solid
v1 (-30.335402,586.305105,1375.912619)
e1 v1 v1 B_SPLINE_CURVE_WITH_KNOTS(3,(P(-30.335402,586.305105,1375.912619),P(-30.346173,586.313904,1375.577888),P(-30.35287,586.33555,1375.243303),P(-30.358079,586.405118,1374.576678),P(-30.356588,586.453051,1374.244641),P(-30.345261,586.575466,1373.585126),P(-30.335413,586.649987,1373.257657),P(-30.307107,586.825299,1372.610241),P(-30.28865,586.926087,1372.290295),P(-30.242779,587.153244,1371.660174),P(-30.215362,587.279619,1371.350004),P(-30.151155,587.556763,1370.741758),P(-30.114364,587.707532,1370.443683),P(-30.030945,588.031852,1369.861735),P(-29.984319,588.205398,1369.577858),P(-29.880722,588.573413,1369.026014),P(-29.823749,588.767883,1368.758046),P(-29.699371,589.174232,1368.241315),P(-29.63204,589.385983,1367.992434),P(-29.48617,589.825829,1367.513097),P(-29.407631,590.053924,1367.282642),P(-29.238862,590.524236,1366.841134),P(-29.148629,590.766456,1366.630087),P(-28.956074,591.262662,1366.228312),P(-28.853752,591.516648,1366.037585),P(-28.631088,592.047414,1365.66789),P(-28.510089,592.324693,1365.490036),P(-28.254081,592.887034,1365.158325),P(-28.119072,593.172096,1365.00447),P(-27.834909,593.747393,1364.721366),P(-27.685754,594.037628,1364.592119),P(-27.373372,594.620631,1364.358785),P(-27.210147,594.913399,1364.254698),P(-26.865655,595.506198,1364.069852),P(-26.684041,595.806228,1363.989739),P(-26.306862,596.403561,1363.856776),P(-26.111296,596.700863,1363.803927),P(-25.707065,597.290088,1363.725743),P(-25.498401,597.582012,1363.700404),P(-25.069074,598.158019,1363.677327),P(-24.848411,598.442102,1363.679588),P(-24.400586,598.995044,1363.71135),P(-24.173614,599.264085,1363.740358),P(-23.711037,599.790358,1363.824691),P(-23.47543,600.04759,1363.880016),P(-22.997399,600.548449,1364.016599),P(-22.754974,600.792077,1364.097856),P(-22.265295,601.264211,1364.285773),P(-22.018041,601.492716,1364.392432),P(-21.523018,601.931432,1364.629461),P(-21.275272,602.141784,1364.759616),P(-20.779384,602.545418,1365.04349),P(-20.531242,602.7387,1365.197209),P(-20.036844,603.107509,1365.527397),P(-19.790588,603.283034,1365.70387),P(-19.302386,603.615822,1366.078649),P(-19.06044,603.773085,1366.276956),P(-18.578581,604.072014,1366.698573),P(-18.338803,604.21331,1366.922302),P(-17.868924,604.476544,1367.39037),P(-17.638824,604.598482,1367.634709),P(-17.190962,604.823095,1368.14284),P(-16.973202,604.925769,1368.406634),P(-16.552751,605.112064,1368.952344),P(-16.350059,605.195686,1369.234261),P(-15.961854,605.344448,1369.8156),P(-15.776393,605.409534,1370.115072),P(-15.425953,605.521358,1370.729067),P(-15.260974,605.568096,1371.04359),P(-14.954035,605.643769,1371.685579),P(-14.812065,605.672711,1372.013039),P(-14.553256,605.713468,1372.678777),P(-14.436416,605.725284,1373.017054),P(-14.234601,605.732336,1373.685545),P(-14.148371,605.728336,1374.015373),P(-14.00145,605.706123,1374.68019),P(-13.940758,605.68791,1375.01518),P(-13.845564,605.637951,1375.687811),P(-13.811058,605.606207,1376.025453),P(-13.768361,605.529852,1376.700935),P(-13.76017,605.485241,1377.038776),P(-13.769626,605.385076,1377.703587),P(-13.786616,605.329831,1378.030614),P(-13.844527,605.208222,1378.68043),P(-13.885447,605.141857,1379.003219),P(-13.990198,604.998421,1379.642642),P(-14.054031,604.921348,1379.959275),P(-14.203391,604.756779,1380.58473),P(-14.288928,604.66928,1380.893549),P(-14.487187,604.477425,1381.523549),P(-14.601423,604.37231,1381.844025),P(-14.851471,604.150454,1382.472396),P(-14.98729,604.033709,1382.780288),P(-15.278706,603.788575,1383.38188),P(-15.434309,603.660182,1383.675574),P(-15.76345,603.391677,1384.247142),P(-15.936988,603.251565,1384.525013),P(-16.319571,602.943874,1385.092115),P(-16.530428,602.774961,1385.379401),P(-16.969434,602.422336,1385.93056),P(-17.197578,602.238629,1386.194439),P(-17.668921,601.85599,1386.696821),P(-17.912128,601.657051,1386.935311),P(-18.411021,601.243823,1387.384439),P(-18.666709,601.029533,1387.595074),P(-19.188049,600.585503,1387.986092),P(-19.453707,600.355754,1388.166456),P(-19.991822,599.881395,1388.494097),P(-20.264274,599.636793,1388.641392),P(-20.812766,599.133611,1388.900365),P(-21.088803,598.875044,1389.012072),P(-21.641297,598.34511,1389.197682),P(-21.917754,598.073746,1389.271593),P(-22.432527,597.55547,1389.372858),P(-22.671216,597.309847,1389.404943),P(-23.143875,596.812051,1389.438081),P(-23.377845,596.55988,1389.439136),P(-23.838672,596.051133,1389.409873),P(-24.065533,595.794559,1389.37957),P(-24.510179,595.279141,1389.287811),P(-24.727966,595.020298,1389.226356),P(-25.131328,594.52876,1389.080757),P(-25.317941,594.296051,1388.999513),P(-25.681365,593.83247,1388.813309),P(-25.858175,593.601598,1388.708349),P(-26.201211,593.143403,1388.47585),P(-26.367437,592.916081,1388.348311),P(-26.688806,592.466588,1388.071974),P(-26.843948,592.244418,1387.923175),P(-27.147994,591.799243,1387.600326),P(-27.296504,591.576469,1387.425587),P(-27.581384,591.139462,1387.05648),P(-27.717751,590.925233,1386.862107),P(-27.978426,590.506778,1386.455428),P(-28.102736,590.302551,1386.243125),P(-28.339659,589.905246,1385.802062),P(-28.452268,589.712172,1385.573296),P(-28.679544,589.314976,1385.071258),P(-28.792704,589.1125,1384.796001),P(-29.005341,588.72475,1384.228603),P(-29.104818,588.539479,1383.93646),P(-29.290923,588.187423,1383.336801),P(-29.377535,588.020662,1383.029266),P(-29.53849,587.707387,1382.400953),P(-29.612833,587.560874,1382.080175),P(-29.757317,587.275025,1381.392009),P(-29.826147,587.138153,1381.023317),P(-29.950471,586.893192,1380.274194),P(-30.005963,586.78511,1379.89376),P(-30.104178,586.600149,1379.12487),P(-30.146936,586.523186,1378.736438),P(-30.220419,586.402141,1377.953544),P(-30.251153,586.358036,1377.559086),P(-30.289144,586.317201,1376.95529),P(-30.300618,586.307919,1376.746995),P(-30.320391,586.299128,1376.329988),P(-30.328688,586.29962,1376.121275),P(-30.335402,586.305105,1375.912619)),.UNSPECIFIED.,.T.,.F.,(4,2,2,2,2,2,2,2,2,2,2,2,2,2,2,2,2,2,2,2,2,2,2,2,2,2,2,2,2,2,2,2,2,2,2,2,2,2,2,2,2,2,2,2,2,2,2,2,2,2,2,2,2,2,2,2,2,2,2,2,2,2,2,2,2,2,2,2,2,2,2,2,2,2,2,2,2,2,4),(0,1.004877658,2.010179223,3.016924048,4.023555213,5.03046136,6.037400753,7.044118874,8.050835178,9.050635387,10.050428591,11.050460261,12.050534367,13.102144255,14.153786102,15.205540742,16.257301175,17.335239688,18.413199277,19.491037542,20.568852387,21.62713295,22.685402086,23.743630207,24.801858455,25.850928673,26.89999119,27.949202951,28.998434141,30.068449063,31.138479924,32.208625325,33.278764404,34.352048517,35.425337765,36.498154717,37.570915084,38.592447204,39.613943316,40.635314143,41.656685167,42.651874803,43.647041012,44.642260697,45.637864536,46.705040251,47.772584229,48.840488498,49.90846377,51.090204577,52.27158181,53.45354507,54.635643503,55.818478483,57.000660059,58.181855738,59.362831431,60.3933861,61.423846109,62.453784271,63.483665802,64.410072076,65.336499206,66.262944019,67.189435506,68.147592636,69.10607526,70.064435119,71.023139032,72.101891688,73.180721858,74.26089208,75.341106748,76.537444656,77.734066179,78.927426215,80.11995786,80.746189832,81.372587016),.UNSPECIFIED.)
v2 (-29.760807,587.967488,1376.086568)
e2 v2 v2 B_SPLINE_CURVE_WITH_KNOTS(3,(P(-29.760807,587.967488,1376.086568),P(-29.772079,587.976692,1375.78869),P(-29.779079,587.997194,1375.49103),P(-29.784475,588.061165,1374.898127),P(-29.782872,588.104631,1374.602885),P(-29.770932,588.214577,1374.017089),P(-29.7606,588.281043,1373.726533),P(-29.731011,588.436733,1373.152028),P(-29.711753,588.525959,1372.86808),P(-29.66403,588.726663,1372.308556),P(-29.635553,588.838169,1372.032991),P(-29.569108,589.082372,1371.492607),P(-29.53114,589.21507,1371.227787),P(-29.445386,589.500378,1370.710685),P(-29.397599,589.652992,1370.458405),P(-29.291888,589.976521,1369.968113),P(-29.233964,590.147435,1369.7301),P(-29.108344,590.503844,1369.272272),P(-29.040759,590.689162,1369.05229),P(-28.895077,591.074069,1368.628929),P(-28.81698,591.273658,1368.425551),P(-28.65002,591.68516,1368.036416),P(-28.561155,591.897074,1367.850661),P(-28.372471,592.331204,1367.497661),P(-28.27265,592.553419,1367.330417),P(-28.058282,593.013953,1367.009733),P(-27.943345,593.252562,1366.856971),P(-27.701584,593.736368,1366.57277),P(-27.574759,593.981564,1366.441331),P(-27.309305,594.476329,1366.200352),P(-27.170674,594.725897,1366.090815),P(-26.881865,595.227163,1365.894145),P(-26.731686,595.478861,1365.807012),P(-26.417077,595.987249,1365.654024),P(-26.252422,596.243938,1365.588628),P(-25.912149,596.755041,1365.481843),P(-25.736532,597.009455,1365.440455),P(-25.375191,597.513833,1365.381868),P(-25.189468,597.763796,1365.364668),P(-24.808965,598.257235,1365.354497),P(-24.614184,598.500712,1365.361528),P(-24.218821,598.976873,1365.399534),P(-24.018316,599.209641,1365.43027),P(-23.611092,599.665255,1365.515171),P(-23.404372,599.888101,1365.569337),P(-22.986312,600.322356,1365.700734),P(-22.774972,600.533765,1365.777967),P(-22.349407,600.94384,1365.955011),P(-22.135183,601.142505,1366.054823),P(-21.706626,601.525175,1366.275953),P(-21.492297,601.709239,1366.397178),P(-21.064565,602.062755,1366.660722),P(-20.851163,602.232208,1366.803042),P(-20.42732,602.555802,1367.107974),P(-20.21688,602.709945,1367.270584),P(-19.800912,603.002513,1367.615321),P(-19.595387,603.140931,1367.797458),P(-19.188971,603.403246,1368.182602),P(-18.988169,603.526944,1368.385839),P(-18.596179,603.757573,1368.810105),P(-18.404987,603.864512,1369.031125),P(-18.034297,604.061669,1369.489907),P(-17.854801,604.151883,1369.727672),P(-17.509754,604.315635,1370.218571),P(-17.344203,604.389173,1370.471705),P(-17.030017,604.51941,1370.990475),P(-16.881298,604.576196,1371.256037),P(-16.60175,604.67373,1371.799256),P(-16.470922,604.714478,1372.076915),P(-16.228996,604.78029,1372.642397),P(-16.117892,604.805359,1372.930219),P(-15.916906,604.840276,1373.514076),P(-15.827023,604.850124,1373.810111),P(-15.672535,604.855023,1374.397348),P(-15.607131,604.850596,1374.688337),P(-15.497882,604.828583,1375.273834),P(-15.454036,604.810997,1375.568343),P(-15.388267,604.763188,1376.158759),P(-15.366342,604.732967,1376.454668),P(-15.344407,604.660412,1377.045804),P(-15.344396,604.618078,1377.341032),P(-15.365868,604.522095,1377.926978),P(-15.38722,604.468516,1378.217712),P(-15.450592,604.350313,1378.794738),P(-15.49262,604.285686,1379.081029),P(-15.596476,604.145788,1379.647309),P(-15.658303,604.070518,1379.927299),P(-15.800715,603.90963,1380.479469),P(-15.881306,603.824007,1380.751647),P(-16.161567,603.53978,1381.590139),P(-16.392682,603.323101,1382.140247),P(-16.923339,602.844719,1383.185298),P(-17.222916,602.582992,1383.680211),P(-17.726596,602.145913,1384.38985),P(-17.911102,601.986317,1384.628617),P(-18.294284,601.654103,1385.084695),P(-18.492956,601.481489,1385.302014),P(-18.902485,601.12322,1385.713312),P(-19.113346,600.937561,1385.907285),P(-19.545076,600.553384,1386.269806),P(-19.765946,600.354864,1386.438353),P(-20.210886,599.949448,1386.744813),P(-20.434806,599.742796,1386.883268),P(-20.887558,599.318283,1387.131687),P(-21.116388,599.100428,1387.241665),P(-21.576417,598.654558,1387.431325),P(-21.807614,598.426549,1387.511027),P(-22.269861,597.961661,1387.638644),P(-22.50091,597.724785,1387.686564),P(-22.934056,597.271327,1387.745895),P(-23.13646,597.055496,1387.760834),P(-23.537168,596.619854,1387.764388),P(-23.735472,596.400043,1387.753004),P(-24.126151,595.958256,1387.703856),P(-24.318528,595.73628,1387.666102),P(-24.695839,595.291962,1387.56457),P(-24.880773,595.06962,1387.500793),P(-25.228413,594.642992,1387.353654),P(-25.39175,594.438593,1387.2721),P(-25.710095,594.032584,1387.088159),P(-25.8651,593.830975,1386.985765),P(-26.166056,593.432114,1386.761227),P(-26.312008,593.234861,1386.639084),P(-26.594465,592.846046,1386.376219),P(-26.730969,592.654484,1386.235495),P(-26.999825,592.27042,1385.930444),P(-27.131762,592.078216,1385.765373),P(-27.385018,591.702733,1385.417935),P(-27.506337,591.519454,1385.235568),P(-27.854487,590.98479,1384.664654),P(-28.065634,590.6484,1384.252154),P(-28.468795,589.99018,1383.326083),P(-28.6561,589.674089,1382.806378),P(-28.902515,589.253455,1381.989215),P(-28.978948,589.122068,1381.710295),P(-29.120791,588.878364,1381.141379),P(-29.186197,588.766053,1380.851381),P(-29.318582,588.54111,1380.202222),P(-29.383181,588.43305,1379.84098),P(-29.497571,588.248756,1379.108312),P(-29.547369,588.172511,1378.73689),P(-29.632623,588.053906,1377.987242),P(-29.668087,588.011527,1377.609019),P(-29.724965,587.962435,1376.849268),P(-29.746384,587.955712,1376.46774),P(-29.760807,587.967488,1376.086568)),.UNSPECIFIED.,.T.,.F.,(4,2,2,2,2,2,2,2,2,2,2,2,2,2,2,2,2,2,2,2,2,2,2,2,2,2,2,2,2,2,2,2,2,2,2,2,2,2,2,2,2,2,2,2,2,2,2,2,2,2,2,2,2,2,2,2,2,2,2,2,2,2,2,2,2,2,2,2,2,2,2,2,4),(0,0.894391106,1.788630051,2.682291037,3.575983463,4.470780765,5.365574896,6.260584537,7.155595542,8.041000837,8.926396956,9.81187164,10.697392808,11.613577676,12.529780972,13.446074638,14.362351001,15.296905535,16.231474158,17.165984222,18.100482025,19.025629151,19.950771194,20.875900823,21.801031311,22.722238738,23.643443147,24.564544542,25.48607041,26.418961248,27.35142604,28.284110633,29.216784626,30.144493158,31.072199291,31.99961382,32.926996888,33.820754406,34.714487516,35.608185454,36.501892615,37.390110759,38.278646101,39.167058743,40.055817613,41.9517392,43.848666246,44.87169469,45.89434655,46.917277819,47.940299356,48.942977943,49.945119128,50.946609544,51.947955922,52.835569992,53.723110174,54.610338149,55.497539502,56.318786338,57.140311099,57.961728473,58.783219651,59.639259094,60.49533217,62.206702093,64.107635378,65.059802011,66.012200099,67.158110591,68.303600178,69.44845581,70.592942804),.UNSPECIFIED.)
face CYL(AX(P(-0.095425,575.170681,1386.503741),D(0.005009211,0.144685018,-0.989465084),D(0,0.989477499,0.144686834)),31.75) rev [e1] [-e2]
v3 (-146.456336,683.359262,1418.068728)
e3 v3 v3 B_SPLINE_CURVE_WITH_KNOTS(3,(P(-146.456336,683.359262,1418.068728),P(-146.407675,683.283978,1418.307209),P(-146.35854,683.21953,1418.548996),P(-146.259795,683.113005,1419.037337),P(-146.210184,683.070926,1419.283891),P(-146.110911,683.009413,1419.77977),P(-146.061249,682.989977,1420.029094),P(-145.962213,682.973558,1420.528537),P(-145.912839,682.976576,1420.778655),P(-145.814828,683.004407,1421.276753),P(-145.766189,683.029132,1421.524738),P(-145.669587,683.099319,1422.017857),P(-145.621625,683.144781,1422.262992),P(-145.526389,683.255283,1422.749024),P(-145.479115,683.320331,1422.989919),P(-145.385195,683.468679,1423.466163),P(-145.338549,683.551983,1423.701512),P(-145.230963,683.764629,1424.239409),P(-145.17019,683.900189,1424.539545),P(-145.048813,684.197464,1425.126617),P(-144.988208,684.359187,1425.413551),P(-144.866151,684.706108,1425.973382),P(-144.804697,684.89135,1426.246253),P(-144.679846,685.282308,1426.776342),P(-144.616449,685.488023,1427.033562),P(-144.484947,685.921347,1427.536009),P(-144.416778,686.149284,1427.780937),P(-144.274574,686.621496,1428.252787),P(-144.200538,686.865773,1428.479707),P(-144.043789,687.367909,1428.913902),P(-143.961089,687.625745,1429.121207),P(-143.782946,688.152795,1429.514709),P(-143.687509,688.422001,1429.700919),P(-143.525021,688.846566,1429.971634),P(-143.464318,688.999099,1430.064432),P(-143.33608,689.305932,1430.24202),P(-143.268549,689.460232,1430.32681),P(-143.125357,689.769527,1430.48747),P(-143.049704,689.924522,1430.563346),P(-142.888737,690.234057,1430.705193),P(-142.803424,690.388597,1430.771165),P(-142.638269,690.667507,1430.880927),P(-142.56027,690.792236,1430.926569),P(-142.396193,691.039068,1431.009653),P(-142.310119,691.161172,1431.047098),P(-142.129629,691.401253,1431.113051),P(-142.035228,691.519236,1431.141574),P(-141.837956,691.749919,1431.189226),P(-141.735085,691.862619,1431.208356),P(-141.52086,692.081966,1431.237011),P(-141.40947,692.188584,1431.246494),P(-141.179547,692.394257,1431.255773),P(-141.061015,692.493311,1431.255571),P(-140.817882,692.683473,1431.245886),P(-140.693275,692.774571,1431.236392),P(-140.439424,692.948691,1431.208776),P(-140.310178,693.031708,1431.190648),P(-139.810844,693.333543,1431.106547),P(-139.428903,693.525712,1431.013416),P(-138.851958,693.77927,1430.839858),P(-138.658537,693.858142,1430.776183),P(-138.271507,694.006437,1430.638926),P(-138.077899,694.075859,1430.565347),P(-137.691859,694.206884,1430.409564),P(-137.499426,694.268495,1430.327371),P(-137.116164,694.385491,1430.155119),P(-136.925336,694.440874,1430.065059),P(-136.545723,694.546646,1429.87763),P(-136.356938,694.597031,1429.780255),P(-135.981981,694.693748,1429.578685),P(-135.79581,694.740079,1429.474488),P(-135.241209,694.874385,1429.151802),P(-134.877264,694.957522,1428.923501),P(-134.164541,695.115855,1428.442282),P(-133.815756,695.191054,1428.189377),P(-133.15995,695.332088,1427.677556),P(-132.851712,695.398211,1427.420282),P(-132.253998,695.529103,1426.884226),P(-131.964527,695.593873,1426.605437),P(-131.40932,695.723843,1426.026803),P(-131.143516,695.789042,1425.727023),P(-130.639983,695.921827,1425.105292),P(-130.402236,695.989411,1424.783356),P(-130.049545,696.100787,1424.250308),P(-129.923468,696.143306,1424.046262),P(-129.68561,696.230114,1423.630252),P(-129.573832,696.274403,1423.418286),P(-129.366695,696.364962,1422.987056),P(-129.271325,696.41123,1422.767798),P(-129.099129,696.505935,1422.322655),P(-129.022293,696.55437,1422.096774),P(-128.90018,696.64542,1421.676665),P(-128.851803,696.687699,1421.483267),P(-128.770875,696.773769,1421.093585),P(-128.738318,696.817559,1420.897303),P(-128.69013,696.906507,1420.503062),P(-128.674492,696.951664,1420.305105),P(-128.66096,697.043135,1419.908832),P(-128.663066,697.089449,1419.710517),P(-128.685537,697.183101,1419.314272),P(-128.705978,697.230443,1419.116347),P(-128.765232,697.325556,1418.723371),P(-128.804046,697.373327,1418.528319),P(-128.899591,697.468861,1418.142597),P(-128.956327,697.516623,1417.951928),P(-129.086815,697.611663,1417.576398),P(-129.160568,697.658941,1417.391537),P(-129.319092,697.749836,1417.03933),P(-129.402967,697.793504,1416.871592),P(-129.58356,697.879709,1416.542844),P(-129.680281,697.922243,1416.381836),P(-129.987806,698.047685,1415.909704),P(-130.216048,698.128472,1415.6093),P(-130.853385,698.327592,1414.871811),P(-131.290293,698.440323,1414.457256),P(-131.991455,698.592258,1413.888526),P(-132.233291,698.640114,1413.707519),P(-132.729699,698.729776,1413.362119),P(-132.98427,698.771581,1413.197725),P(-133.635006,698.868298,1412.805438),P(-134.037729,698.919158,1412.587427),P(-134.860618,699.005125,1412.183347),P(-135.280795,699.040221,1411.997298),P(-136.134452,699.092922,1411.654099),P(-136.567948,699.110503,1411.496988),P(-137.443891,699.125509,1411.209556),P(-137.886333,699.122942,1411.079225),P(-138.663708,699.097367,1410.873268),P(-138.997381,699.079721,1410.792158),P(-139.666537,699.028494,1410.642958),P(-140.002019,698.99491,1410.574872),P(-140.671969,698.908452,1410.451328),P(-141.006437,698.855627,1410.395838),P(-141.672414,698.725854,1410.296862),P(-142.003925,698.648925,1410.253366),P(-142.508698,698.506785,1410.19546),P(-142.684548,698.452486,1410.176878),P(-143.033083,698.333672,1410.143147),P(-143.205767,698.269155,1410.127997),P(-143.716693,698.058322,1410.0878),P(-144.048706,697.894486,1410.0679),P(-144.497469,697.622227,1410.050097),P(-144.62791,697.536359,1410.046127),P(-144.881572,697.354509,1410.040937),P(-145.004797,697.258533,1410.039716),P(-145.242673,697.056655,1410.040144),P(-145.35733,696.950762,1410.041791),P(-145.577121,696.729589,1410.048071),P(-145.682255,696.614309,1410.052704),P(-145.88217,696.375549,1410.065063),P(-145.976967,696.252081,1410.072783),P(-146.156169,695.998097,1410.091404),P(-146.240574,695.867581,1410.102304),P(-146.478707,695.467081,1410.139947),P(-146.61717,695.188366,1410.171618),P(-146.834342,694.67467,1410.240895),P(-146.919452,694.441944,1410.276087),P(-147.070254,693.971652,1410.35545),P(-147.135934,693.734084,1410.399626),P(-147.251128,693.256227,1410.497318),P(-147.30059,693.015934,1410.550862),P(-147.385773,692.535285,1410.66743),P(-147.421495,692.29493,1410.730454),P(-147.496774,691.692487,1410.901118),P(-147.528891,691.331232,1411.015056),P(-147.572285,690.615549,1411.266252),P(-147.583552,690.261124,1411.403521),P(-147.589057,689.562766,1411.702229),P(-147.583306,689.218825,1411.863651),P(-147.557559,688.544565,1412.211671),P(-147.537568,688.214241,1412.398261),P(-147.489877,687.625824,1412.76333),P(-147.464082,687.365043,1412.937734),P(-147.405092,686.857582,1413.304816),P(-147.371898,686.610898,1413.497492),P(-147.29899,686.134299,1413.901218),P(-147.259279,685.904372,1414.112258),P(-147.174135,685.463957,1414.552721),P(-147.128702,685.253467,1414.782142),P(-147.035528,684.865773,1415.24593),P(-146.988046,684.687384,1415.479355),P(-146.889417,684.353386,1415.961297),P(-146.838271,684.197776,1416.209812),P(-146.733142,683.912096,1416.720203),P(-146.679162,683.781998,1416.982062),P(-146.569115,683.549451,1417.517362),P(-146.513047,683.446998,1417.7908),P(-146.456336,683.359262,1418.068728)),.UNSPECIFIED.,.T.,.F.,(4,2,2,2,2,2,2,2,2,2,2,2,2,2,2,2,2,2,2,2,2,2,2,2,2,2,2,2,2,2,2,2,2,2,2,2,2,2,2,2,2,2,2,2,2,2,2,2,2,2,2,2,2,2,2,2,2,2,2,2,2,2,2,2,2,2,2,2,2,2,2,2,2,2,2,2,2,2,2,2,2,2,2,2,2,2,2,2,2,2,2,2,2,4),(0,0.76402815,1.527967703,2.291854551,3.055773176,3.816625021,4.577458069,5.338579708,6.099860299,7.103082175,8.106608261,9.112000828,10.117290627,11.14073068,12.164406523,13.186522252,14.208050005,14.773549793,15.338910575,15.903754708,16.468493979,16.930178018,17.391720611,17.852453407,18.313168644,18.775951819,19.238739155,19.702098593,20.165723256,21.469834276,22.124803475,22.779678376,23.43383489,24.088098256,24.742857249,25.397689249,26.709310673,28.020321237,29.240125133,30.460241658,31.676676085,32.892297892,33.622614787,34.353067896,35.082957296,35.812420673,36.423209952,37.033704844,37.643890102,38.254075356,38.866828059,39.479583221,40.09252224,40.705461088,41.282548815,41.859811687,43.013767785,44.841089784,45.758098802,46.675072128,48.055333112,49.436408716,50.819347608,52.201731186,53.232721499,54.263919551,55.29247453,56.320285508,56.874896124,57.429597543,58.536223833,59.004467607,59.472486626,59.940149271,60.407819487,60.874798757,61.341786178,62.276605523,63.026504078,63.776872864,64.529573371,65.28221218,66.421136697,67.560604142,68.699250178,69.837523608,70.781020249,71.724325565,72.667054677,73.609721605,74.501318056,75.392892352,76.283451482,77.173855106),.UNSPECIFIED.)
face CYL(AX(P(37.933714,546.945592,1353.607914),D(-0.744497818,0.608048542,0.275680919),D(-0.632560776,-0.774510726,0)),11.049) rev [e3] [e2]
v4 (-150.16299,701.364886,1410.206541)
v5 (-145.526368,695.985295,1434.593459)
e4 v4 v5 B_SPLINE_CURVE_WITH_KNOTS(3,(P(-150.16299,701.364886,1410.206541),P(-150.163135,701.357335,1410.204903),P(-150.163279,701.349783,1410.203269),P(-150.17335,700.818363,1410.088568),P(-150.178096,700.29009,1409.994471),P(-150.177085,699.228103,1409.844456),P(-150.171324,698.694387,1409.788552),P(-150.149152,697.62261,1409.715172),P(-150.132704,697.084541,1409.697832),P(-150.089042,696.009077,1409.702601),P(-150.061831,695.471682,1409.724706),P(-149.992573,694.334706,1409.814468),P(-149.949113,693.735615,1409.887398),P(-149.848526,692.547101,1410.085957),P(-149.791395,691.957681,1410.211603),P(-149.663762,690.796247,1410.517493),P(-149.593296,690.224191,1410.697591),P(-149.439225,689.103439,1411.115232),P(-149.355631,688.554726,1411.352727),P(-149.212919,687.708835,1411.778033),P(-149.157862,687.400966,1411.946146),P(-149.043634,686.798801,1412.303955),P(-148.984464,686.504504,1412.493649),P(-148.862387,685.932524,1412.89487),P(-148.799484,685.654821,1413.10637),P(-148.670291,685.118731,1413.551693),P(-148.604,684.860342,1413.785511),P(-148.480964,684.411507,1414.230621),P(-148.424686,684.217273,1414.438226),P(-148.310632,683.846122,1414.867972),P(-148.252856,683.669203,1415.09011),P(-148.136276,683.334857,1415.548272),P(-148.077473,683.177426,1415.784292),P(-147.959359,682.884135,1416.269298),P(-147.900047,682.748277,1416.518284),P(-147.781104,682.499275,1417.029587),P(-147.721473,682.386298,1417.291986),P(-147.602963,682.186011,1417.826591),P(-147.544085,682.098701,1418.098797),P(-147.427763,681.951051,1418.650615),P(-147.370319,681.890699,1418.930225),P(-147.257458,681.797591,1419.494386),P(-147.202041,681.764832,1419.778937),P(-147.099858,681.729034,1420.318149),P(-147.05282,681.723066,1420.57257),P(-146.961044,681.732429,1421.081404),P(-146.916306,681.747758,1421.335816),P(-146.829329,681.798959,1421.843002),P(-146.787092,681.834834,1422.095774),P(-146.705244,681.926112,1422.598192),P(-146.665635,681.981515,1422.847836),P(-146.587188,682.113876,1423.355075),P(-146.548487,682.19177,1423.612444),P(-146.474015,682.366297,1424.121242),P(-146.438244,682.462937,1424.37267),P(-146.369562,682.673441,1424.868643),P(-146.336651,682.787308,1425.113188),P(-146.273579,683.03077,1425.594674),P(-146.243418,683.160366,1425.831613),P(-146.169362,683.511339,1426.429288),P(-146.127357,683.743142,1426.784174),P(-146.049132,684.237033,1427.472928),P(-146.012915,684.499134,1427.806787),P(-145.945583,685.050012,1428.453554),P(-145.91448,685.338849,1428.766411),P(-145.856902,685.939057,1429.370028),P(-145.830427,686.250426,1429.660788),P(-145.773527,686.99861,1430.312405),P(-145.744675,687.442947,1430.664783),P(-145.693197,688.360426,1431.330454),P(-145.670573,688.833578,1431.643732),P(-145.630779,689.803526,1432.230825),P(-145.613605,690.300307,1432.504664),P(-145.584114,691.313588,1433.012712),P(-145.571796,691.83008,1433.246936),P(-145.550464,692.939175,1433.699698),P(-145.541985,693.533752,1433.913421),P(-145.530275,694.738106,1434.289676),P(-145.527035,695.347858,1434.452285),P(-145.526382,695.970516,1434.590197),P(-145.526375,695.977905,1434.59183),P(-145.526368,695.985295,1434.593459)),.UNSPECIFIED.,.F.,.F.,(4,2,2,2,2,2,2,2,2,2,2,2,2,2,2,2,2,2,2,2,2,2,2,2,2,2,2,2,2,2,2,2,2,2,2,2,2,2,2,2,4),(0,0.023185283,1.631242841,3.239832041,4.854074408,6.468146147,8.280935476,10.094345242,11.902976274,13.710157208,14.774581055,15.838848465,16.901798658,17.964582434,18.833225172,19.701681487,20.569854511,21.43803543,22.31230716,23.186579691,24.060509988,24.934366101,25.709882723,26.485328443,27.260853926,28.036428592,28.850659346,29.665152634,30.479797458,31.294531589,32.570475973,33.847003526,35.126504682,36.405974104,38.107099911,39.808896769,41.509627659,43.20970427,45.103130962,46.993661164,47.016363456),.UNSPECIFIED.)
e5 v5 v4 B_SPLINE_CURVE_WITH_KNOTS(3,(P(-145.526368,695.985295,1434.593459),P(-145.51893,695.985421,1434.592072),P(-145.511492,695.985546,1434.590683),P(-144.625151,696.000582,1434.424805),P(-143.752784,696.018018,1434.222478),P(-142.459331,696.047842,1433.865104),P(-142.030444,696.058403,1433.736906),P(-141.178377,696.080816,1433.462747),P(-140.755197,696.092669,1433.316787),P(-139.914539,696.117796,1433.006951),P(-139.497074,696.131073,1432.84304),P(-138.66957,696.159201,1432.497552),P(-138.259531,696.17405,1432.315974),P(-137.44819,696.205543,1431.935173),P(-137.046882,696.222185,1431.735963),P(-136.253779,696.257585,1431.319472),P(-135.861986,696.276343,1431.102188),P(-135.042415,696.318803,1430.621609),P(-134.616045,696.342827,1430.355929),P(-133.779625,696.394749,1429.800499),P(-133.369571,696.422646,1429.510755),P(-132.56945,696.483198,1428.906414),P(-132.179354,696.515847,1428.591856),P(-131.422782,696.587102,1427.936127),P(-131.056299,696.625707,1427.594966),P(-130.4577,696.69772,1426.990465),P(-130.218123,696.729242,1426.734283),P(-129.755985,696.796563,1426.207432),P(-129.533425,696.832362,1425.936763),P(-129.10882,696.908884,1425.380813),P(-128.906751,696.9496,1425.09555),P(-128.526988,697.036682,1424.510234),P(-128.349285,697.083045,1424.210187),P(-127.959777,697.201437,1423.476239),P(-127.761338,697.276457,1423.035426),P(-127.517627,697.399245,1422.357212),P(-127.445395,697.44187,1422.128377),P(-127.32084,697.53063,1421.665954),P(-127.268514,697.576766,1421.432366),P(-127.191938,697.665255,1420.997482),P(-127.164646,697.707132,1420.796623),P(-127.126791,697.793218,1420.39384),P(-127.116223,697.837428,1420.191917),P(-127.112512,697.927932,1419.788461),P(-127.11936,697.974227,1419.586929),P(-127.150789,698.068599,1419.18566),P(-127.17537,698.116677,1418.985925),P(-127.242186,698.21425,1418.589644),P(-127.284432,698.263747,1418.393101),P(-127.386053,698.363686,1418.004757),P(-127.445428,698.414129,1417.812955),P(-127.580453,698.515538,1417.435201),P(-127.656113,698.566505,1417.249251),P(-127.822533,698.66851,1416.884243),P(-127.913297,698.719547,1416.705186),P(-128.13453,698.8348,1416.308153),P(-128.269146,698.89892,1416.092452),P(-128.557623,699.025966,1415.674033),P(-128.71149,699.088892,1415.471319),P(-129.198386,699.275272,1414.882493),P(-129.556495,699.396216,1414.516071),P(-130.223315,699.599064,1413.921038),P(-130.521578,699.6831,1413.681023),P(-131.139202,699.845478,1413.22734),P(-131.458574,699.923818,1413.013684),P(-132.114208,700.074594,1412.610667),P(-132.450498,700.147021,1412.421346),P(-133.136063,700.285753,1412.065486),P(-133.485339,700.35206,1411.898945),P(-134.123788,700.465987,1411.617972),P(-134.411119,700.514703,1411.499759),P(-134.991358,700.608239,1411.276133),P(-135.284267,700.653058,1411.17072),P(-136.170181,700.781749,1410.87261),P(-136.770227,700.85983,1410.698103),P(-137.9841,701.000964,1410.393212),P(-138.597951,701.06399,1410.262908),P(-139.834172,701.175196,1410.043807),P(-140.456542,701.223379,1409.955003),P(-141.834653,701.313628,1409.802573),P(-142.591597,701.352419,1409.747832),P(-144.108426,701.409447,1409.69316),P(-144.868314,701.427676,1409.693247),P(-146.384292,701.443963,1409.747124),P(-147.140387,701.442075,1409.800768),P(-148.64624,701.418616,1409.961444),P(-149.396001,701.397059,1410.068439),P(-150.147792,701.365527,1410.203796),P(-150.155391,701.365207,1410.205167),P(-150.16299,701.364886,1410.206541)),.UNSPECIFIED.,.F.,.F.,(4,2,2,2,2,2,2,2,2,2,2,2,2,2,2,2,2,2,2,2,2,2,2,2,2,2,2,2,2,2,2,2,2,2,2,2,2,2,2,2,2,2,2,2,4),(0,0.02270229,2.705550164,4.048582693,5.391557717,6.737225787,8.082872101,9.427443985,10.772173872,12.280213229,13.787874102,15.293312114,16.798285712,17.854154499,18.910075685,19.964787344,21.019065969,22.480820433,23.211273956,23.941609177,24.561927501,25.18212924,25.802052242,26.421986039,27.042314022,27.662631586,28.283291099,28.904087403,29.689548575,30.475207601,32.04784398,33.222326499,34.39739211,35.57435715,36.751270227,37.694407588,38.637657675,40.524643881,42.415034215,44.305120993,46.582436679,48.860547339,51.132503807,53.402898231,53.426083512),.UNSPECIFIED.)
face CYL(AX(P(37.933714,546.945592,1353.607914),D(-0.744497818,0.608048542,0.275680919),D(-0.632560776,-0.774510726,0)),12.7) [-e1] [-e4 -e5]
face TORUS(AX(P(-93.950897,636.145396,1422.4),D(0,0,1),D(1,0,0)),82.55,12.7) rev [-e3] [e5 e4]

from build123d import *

# Parameters (mm, degrees)
BOSS_EXTRUDE1_OUTLINE_R   = 12.7
BOSS_EXTRUDE1_OUTLINE_R_2 = 11.049
BOSS_EXTRUDE1_DEPTH       = 169.483735571
BOSS_EXTRUDE1_START       = -1290
BOSS_EXTRUDE1_2_DEPTH     = 28
SKETCH2_R                 = 12.7


with BuildPart() as part:
    # Boss-Extrude1: read off the stored shape, not the designer's step
    # Boss-Extrude1 outline → Boss-Extrude1 (new body)
    with BuildSketch(Plane(origin=(-147.844678818, 698.675090596, 1422.4), x_dir=(-0.21607186737585407, 0.17125420007266837, -0.9612413573531791), z_dir=(0.7444978184598124, -0.6080485419276472, -0.2756809187597909))):
        Circle(BOSS_EXTRUDE1_OUTLINE_R)
        Circle(BOSS_EXTRUDE1_OUTLINE_R_2, mode=Mode.SUBTRACT)
    extrude(amount=BOSS_EXTRUDE1_DEPTH)

    # Boss-Extrude1 2 outline → Boss-Extrude1 2 (cut)
    with BuildSketch(Plane(origin=(0, 0, 0), x_dir=(0.9999874538242801, -0.000724766866537943, 0.0049565014901968504), z_dir=(0.00500921091921221, 0.144685018294151, -0.98946508442046)).offset(BOSS_EXTRUDE1_START)):
        with BuildLine():
            Line((-24.625498717, -777), (-23.968898636, -779.120116752))
            ThreePointArc((-23.968898636, -779.120116752), (-17.679414278, -790.467894395), (-7.375761107, -798.352334912))
            Line((-7.375761107, -798.352334912), (-5, -799.492339639))
            Line((-5, -799.492339639), (-5, -777))
            Line((-5, -777), (-24.625498717, -777))
        make_face()
    extrude(amount=BOSS_EXTRUDE1_2_DEPTH, mode=Mode.SUBTRACT)

    # Cut-Sweep1: sweep along a path in Sketch3
    with BuildLine(Plane.XY.offset(1422.4)) as cut_sweep1_path:
        ThreePointArc((-93.95089657, 718.69539577), (-147.844678818, 698.675090596), (-175.5974564, 648.324959307))
    # Sketch2 → Cut-Sweep1 (sweep, cut)
    with BuildSketch(Plane(origin=(-175.5974564, 648.324959307, 1422.4), x_dir=(0.9890558428813507, -0.14754165399052874, 1.0318371108759884e-15), z_dir=(0.14754165399052874, 0.9890558428813507, -6.916992563193179e-15))):
        Circle(SKETCH2_R)
    sweep(path=cut_sweep1_path.line, mode=Mode.SUBTRACT)


solid = part.part
